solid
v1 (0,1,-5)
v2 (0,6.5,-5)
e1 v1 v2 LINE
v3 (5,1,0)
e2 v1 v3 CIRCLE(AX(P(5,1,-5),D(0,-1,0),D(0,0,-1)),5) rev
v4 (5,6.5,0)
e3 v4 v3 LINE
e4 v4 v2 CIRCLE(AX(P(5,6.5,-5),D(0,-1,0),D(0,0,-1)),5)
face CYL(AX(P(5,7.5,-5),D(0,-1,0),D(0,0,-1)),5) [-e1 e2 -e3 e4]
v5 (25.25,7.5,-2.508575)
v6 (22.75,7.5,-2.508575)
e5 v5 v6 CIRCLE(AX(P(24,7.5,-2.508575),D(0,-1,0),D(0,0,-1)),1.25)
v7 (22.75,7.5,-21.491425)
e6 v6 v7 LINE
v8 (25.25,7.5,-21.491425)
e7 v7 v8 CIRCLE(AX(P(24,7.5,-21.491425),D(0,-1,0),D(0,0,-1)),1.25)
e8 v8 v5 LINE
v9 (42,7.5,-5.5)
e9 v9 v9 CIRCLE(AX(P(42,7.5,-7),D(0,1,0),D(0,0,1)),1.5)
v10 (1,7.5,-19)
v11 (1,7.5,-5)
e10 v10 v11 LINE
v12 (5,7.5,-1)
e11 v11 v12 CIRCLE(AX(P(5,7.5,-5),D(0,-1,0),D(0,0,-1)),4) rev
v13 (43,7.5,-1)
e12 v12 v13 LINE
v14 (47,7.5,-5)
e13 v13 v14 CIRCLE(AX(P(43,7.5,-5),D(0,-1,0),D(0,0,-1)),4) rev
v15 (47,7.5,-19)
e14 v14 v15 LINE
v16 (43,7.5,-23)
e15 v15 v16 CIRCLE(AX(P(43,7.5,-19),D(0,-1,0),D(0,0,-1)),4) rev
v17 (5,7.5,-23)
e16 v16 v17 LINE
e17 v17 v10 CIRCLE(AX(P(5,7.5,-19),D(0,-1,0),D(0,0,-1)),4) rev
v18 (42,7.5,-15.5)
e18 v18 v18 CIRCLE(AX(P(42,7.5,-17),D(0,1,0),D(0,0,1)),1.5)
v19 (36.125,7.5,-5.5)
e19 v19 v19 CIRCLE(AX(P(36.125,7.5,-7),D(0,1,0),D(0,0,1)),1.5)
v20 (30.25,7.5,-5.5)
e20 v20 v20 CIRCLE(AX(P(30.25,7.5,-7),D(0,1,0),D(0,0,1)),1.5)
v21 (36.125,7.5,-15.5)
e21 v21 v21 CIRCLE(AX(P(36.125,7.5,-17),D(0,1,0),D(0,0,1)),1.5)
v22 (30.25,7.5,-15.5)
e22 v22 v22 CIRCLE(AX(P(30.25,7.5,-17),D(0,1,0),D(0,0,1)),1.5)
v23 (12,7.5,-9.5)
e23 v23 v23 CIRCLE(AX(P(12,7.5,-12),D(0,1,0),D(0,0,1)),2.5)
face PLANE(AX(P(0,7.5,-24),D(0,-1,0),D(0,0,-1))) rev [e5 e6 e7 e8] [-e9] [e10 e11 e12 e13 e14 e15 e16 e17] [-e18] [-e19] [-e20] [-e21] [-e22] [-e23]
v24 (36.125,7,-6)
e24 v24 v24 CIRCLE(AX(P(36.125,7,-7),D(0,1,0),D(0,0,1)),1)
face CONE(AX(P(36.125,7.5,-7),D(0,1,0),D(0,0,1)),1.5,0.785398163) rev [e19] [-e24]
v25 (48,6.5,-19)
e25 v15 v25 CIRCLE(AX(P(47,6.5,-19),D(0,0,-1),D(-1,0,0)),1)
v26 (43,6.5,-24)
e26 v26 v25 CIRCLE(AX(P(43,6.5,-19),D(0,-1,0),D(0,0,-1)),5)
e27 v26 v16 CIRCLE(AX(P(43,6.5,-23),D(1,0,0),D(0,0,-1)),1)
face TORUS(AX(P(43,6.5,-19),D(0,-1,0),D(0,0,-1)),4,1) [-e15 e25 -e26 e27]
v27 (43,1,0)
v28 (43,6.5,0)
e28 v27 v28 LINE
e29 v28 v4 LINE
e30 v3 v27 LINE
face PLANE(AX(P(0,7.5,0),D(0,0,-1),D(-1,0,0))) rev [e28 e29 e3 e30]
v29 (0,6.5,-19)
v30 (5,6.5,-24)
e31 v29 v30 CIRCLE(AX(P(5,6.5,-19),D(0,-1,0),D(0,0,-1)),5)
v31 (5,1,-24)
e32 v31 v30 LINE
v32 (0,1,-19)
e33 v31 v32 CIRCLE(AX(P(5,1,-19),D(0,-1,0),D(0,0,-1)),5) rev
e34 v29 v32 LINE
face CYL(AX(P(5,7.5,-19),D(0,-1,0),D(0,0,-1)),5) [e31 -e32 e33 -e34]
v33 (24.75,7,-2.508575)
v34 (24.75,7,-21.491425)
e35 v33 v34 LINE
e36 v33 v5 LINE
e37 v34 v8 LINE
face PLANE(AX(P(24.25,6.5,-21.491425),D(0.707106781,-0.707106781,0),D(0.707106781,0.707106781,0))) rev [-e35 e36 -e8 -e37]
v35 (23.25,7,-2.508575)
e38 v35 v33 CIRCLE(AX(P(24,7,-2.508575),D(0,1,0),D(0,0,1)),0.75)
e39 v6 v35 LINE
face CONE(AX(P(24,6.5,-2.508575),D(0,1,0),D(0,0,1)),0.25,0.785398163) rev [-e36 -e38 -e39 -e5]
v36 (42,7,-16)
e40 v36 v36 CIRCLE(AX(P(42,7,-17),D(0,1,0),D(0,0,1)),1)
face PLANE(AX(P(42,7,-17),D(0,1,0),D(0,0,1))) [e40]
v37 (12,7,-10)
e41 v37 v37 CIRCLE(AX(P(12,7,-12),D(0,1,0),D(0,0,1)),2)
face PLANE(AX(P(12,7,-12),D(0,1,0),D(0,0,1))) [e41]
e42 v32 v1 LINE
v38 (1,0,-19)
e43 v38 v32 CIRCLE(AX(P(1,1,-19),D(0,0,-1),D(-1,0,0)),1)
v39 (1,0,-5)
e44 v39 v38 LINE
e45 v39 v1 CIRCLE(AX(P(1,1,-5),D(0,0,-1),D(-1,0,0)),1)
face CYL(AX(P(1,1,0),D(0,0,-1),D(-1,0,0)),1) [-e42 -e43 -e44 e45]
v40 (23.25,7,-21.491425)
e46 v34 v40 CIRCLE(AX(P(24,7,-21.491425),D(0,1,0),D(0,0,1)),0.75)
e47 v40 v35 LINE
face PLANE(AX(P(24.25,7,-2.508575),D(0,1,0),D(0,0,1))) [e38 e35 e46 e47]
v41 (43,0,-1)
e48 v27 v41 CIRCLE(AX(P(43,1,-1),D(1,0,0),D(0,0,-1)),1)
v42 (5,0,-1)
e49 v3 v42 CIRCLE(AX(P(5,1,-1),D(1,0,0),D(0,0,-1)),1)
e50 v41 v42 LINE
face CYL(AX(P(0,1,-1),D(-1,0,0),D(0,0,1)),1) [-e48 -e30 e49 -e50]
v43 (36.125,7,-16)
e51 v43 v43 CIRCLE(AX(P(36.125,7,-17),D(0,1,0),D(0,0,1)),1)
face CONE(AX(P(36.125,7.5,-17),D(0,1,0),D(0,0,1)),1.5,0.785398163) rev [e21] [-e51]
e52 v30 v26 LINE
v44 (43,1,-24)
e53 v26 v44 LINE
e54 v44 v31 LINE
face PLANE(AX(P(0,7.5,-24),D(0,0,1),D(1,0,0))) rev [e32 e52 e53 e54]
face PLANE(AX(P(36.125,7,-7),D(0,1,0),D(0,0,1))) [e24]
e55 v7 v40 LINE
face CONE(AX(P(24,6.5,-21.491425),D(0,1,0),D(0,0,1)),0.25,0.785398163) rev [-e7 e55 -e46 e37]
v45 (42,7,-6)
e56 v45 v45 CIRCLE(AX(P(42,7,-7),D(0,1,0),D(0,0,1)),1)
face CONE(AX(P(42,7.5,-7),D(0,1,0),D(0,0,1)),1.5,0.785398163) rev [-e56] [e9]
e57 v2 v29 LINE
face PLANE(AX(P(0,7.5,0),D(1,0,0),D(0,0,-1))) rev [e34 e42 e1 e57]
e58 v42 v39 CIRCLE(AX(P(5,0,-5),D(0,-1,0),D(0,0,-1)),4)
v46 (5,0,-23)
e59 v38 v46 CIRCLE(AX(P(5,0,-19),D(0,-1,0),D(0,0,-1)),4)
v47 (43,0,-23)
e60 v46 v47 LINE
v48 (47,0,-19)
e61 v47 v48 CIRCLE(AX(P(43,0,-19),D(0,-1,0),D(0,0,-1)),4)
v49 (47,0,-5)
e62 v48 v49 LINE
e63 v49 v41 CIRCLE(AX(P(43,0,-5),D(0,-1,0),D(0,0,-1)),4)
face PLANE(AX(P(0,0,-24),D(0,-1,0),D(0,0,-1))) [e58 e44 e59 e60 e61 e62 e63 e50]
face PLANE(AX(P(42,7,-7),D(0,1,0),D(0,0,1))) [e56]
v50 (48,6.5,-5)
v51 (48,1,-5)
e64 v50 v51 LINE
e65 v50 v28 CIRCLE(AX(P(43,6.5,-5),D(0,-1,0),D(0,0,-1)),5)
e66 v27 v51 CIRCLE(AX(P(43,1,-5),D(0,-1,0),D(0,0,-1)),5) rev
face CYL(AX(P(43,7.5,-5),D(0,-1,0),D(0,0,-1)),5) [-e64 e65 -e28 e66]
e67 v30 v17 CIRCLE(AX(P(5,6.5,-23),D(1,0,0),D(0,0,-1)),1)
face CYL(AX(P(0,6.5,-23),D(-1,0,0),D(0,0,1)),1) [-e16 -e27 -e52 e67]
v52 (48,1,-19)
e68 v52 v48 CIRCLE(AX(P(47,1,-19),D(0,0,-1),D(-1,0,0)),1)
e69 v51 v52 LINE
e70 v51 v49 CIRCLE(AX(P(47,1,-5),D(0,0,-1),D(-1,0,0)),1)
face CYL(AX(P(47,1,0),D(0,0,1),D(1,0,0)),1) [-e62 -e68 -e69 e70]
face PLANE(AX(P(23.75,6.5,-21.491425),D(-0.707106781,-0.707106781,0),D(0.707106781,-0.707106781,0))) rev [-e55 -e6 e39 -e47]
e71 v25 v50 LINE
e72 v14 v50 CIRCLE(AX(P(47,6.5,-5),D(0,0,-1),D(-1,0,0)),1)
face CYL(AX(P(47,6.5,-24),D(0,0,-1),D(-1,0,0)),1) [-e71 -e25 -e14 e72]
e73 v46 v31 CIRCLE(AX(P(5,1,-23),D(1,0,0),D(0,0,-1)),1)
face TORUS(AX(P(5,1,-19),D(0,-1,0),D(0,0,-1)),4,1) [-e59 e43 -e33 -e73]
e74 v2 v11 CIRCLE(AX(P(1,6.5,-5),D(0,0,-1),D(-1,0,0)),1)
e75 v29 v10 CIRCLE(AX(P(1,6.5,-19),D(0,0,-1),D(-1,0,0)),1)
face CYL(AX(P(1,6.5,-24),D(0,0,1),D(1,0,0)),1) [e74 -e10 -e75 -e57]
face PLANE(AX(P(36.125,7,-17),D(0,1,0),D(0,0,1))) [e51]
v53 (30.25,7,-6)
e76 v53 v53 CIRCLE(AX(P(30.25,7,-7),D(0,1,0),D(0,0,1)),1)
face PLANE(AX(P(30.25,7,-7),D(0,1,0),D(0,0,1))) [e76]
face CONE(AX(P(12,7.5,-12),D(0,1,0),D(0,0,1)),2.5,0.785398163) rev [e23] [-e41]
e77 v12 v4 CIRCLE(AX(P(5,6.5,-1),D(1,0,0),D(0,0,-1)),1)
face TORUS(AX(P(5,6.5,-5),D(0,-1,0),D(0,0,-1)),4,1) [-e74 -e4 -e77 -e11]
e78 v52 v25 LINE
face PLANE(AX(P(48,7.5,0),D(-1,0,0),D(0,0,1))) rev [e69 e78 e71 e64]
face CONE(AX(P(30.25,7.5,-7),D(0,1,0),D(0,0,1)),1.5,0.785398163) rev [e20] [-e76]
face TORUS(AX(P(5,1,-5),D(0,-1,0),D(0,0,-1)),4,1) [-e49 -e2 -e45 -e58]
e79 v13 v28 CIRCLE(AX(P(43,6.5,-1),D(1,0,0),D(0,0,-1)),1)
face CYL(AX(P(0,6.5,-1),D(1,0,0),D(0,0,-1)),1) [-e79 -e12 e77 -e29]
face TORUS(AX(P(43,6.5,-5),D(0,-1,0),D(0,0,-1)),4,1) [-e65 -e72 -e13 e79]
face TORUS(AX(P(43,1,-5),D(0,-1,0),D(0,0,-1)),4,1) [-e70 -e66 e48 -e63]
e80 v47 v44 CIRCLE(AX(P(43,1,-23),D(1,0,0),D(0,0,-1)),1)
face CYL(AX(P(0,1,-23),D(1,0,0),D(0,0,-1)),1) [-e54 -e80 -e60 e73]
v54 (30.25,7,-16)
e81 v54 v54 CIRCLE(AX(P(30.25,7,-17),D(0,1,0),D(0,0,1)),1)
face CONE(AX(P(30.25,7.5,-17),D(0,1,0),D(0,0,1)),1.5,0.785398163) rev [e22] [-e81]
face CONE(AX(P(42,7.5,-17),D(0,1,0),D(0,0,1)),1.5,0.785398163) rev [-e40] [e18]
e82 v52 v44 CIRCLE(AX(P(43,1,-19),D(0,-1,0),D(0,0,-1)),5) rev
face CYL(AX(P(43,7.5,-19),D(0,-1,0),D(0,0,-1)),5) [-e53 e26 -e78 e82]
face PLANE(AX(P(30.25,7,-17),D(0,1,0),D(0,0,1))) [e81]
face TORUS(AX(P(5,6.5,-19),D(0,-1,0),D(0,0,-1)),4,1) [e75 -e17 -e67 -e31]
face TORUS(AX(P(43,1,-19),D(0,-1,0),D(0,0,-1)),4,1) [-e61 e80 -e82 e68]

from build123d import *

# Parameters (mm, degrees)
ESQUISSE1_W                = 48
ESQUISSE1_H                = 24
EXTRUSION1_DEPTH           = 7.5
CONG_2_R                   = 5
CONG_5_R                   = 1
CONG_6_R                   = 1
ESQUISSE4_W                = 0.5
ESQUISSE4_H                = 18.982849842
EXTRUSION2_DEPTH           = 0.5
ESQUISSE5_R                = 0.25
EXTRUSION3_DEPTH           = 0.5
CHANFREIN1_SIZE            = 1
ESQUISSE10_R               = 2.5
EXTRUSION8_DEPTH           = 0.5
EXTRUSION8_DRAFT           = -45
ESQUISSE12_R               = 1.5
EXTRUSION9_DEPTH           = 0.5
EXTRUSION9_DRAFT           = -45
EXTRUSION9_PROFILE_2_DEPTH = 0.5
EXTRUSION9_PROFILE_2_DRAFT = -45
EXTRUSION9_PROFILE_3_DEPTH = 0.5
EXTRUSION9_PROFILE_3_DRAFT = -45
EXTRUSION9_PROFILE_4_DEPTH = 0.5
EXTRUSION9_PROFILE_4_DRAFT = -45
EXTRUSION9_PROFILE_5_DEPTH = 0.5
EXTRUSION9_PROFILE_5_DRAFT = -45
EXTRUSION9_PROFILE_6_DEPTH = 0.5
EXTRUSION9_PROFILE_6_DRAFT = -45


with BuildPart() as part:
    # Esquisse1 → Extrusion1 (new body)
    with BuildSketch(Plane(origin=(0, 0, 0), x_dir=(1, 0, 0), z_dir=(0, 1, 0))):
        with Locations((24, 12)):
            Rectangle(ESQUISSE1_W, ESQUISSE1_H)
    extrude(amount=EXTRUSION1_DEPTH)

    # Congé2
    cong_2_edges = [part.edges().sort_by_distance(p)[0] for p in [
        (0, 3.75, -24),
        (48, 3.75, -24),
        (48, 3.75, 0),
        (0, 3.75, 0),
    ]]
    fillet(cong_2_edges, radius=CONG_2_R)

    # Congé5
    cong_5_edges = [part.edges().sort_by_distance(p)[0] for p in [
        (48, 7.5, -12),
        (24, 7.5, 0),
        (0, 7.5, -12),
        (24, 7.5, -24),
        (1.464466094, 7.5, -22.535533906),
        (1.464466094, 7.5, -1.464466094),
        (46.535533906, 7.5, -22.535533906),
        (46.535533906, 7.5, -1.464466094),
    ]]
    fillet(cong_5_edges, radius=CONG_5_R)

    # Congé6
    cong_6_edges = [part.edges().sort_by_distance(p)[0] for p in [
        (48, 0, -12),
        (0, 0, -12),
        (24, 0, -24),
        (24, 0, 0),
        (1.464466094, 0, -22.535533906),
        (1.464466094, 0, -1.464466094),
        (46.535533906, 0, -22.535533906),
        (46.535533906, 0, -1.464466094),
    ]]
    fillet(cong_6_edges, radius=CONG_6_R)

    # Esquisse4 → Extrusion2 (cut)
    with BuildSketch(Plane(origin=(0, 7.5, 0), x_dir=(1, 0, 0), z_dir=(0, 1, 0))):
        with Locations((24, 12)):
            Rectangle(ESQUISSE4_W, ESQUISSE4_H)
    extrude(amount=-EXTRUSION2_DEPTH, mode=Mode.SUBTRACT)

    # Esquisse5 → Extrusion3 (cut)
    with BuildSketch(Plane(origin=(0, 7.5, 0), x_dir=(1, 0, 0), z_dir=(0, 1, 0))):
        with Locations((24, 21.491424921)):
            Circle(ESQUISSE5_R)
        with Locations((24, 2.508575079)):
            Circle(ESQUISSE5_R)
    extrude(amount=-EXTRUSION3_DEPTH, mode=Mode.SUBTRACT)

    # Chanfrein1
    # the kernel refuses this chamfer: 1 mm, written as the material it takes off along each edge
    with BuildSketch(Plane(origin=(24, 7.5, -21.491424921), x_dir=(1, 0, 0), z_dir=(0, 0, 1))) as chanfrein1_piece_1_section:
        Polygon((0.25 + CHANFREIN1_SIZE, 0), (0.25, -CHANFREIN1_SIZE), (0.25, 0), align=None)
    chanfrein1_piece_1 = revolve(axis=Axis((24, 7.5, -21.491424921), (0, 1, 0)), revolution_arc=180, mode=Mode.PRIVATE)
    chanfrein1_piece_1 = split(chanfrein1_piece_1, bisect_by=Plane(origin=(24, 7, -21.964580549), z_dir=(0, 1, 0)), keep=Keep.TOP, mode=Mode.PRIVATE)
    add(chanfrein1_piece_1, mode=Mode.SUBTRACT)
    with BuildSketch(Plane(origin=(24.25, 7.5, -21.491424921), x_dir=(0.9996219169112968, 0.02749587661058651, 0), z_dir=(0, 0, 1))) as chanfrein1_piece_2_section:
        Polygon((CHANFREIN1_SIZE * 0.999621916911, -CHANFREIN1_SIZE * 0.0274958766106), (-CHANFREIN1_SIZE * 0.0274958766106, -CHANFREIN1_SIZE * 0.999621916911), (0, 0), align=None)
    chanfrein1_piece_2 = extrude(amount=18.982849842, mode=Mode.PRIVATE)
    chanfrein1_piece_2 = split(chanfrein1_piece_2, bisect_by=Plane(origin=(24.643401084, 7, -12), z_dir=(0, 1, 0)), keep=Keep.TOP, mode=Mode.PRIVATE)
    add(chanfrein1_piece_2, mode=Mode.SUBTRACT)
    with BuildSketch(Plane(origin=(24, 7.5, -2.508575079), x_dir=(-1, 0, 0), z_dir=(0, 0, -1))) as chanfrein1_piece_3_section:
        Polygon((0.25 + CHANFREIN1_SIZE, 0), (0.25, -CHANFREIN1_SIZE), (0.25, 0), align=None)
    chanfrein1_piece_3 = revolve(axis=Axis((24, 7.5, -2.508575079), (0, 1, 0)), revolution_arc=180, mode=Mode.PRIVATE)
    chanfrein1_piece_3 = split(chanfrein1_piece_3, bisect_by=Plane(origin=(24, 7, -2.035419451), z_dir=(0, 1, 0)), keep=Keep.TOP, mode=Mode.PRIVATE)
    add(chanfrein1_piece_3, mode=Mode.SUBTRACT)
    with BuildSketch(Plane(origin=(23.75, 7.5, -2.508575079), x_dir=(-0.9996219169112968, 0.02749587661058651, 0), z_dir=(0, 0, -1))) as chanfrein1_piece_4_section:
        Polygon((CHANFREIN1_SIZE * 0.999621916911, -CHANFREIN1_SIZE * 0.0274958766106), (-CHANFREIN1_SIZE * 0.0274958766106, -CHANFREIN1_SIZE * 0.999621916911), (0, 0), align=None)
    chanfrein1_piece_4 = extrude(amount=18.982849842, mode=Mode.PRIVATE)
    chanfrein1_piece_4 = split(chanfrein1_piece_4, bisect_by=Plane(origin=(23.356598916, 7, -12), z_dir=(0, 1, 0)), keep=Keep.TOP, mode=Mode.PRIVATE)
    add(chanfrein1_piece_4, mode=Mode.SUBTRACT)


with BuildPart() as extrusion8_tool:
    # Esquisse10 → Extrusion8 (with draft: the straight prism first)
    with BuildSketch(Plane(origin=(0, 7.5, 0), x_dir=(1, 0, 0), z_dir=(0, 1, 0))):
        with Locations((12, 12)):
            Circle(ESQUISSE10_R)
    extrude(amount=-EXTRUSION8_DEPTH)
    # Extrusion8: the draft: its side faces are tilted about the plane it starts from
    extrusion8_sides = [extrusion8_tool.faces().sort_by_distance(p)[0] for p in [
        (9.5, 7.25, -12),
    ]]
    draft(extrusion8_sides, Plane(origin=(0, 7.5, 0), x_dir=(1, 0, 0), z_dir=(0, 1, 0)), EXTRUSION8_DRAFT)


with BuildPart() as part_1:
    add(part.part)

    # Extrusion8: cut by extrusion8_tool
    add(extrusion8_tool.part, mode=Mode.SUBTRACT)


with BuildPart() as extrusion9_tool:
    # Esquisse12 → Extrusion9 (with draft: the straight prism first)
    with BuildSketch(Plane(origin=(0, 7.5, 0), x_dir=(1, 0, 0), z_dir=(0, 1, 0))):
        with Locations((30.25, 17)):
            Circle(ESQUISSE12_R)
    extrude(amount=-EXTRUSION9_DEPTH)
    # Extrusion9: the draft: its side faces are tilted about the plane it starts from
    extrusion9_sides = [extrusion9_tool.faces().sort_by_distance(p)[0] for p in [
        (28.75, 7.25, -17),
    ]]
    draft(extrusion9_sides, Plane(origin=(0, 7.5, 0), x_dir=(1, 0, 0), z_dir=(0, 1, 0)), EXTRUSION9_DRAFT)


with BuildPart() as part_2:
    add(part_1.part)

    # Extrusion9: cut by extrusion9_tool
    add(extrusion9_tool.part, mode=Mode.SUBTRACT)


with BuildPart() as extrusion9_profile_2_tool:
    # Esquisse12 → Extrusion9 profile 2 (with draft: the straight prism first)
    with BuildSketch(Plane(origin=(0, 7.5, 0), x_dir=(1, 0, 0), z_dir=(0, 1, 0))):
        with Locations((36.125, 17)):
            Circle(ESQUISSE12_R)
    extrude(amount=-EXTRUSION9_PROFILE_2_DEPTH)
    # Extrusion9 profile 2: the draft: its side faces are tilted about the plane it starts from
    extrusion9_profile_2_sides = [extrusion9_profile_2_tool.faces().sort_by_distance(p)[0] for p in [
        (34.625, 7.25, -17),
    ]]
    draft(extrusion9_profile_2_sides, Plane(origin=(0, 7.5, 0), x_dir=(1, 0, 0), z_dir=(0, 1, 0)), EXTRUSION9_PROFILE_2_DRAFT)


with BuildPart() as part_3:
    add(part_2.part)

    # Extrusion9 profile 2: cut by extrusion9_profile_2_tool
    add(extrusion9_profile_2_tool.part, mode=Mode.SUBTRACT)


with BuildPart() as extrusion9_profile_3_tool:
    # Esquisse12 → Extrusion9 profile 3 (with draft: the straight prism first)
    with BuildSketch(Plane(origin=(0, 7.5, 0), x_dir=(1, 0, 0), z_dir=(0, 1, 0))):
        with Locations((42, 17)):
            Circle(ESQUISSE12_R)
    extrude(amount=-EXTRUSION9_PROFILE_3_DEPTH)
    # Extrusion9 profile 3: the draft: its side faces are tilted about the plane it starts from
    extrusion9_profile_3_sides = [extrusion9_profile_3_tool.faces().sort_by_distance(p)[0] for p in [
        (40.5, 7.25, -17),
    ]]
    draft(extrusion9_profile_3_sides, Plane(origin=(0, 7.5, 0), x_dir=(1, 0, 0), z_dir=(0, 1, 0)), EXTRUSION9_PROFILE_3_DRAFT)


with BuildPart() as part_4:
    add(part_3.part)

    # Extrusion9 profile 3: cut by extrusion9_profile_3_tool
    add(extrusion9_profile_3_tool.part, mode=Mode.SUBTRACT)


with BuildPart() as extrusion9_profile_4_tool:
    # Esquisse12 → Extrusion9 profile 4 (with draft: the straight prism first)
    with BuildSketch(Plane(origin=(0, 7.5, 0), x_dir=(1, 0, 0), z_dir=(0, 1, 0))):
        with Locations((30.25, 7)):
            Circle(ESQUISSE12_R)
    extrude(amount=-EXTRUSION9_PROFILE_4_DEPTH)
    # Extrusion9 profile 4: the draft: its side faces are tilted about the plane it starts from
    extrusion9_profile_4_sides = [extrusion9_profile_4_tool.faces().sort_by_distance(p)[0] for p in [
        (28.75, 7.25, -7),
    ]]
    draft(extrusion9_profile_4_sides, Plane(origin=(0, 7.5, 0), x_dir=(1, 0, 0), z_dir=(0, 1, 0)), EXTRUSION9_PROFILE_4_DRAFT)


with BuildPart() as part_5:
    add(part_4.part)

    # Extrusion9 profile 4: cut by extrusion9_profile_4_tool
    add(extrusion9_profile_4_tool.part, mode=Mode.SUBTRACT)


with BuildPart() as extrusion9_profile_5_tool:
    # Esquisse12 → Extrusion9 profile 5 (with draft: the straight prism first)
    with BuildSketch(Plane(origin=(0, 7.5, 0), x_dir=(1, 0, 0), z_dir=(0, 1, 0))):
        with Locations((36.125, 7)):
            Circle(ESQUISSE12_R)
    extrude(amount=-EXTRUSION9_PROFILE_5_DEPTH)
    # Extrusion9 profile 5: the draft: its side faces are tilted about the plane it starts from
    extrusion9_profile_5_sides = [extrusion9_profile_5_tool.faces().sort_by_distance(p)[0] for p in [
        (34.625, 7.25, -7),
    ]]
    draft(extrusion9_profile_5_sides, Plane(origin=(0, 7.5, 0), x_dir=(1, 0, 0), z_dir=(0, 1, 0)), EXTRUSION9_PROFILE_5_DRAFT)


with BuildPart() as part_6:
    add(part_5.part)

    # Extrusion9 profile 5: cut by extrusion9_profile_5_tool
    add(extrusion9_profile_5_tool.part, mode=Mode.SUBTRACT)


with BuildPart() as extrusion9_profile_6_tool:
    # Esquisse12 → Extrusion9 profile 6 (with draft: the straight prism first)
    with BuildSketch(Plane(origin=(0, 7.5, 0), x_dir=(1, 0, 0), z_dir=(0, 1, 0))):
        with Locations((42, 7)):
            Circle(ESQUISSE12_R)
    extrude(amount=-EXTRUSION9_PROFILE_6_DEPTH)
    # Extrusion9 profile 6: the draft: its side faces are tilted about the plane it starts from
    extrusion9_profile_6_sides = [extrusion9_profile_6_tool.faces().sort_by_distance(p)[0] for p in [
        (40.5, 7.25, -7),
    ]]
    draft(extrusion9_profile_6_sides, Plane(origin=(0, 7.5, 0), x_dir=(1, 0, 0), z_dir=(0, 1, 0)), EXTRUSION9_PROFILE_6_DRAFT)


with BuildPart() as part_7:
    add(part_6.part)

    # Extrusion9 profile 6: cut by extrusion9_profile_6_tool
    add(extrusion9_profile_6_tool.part, mode=Mode.SUBTRACT)


solid = part_7.part
